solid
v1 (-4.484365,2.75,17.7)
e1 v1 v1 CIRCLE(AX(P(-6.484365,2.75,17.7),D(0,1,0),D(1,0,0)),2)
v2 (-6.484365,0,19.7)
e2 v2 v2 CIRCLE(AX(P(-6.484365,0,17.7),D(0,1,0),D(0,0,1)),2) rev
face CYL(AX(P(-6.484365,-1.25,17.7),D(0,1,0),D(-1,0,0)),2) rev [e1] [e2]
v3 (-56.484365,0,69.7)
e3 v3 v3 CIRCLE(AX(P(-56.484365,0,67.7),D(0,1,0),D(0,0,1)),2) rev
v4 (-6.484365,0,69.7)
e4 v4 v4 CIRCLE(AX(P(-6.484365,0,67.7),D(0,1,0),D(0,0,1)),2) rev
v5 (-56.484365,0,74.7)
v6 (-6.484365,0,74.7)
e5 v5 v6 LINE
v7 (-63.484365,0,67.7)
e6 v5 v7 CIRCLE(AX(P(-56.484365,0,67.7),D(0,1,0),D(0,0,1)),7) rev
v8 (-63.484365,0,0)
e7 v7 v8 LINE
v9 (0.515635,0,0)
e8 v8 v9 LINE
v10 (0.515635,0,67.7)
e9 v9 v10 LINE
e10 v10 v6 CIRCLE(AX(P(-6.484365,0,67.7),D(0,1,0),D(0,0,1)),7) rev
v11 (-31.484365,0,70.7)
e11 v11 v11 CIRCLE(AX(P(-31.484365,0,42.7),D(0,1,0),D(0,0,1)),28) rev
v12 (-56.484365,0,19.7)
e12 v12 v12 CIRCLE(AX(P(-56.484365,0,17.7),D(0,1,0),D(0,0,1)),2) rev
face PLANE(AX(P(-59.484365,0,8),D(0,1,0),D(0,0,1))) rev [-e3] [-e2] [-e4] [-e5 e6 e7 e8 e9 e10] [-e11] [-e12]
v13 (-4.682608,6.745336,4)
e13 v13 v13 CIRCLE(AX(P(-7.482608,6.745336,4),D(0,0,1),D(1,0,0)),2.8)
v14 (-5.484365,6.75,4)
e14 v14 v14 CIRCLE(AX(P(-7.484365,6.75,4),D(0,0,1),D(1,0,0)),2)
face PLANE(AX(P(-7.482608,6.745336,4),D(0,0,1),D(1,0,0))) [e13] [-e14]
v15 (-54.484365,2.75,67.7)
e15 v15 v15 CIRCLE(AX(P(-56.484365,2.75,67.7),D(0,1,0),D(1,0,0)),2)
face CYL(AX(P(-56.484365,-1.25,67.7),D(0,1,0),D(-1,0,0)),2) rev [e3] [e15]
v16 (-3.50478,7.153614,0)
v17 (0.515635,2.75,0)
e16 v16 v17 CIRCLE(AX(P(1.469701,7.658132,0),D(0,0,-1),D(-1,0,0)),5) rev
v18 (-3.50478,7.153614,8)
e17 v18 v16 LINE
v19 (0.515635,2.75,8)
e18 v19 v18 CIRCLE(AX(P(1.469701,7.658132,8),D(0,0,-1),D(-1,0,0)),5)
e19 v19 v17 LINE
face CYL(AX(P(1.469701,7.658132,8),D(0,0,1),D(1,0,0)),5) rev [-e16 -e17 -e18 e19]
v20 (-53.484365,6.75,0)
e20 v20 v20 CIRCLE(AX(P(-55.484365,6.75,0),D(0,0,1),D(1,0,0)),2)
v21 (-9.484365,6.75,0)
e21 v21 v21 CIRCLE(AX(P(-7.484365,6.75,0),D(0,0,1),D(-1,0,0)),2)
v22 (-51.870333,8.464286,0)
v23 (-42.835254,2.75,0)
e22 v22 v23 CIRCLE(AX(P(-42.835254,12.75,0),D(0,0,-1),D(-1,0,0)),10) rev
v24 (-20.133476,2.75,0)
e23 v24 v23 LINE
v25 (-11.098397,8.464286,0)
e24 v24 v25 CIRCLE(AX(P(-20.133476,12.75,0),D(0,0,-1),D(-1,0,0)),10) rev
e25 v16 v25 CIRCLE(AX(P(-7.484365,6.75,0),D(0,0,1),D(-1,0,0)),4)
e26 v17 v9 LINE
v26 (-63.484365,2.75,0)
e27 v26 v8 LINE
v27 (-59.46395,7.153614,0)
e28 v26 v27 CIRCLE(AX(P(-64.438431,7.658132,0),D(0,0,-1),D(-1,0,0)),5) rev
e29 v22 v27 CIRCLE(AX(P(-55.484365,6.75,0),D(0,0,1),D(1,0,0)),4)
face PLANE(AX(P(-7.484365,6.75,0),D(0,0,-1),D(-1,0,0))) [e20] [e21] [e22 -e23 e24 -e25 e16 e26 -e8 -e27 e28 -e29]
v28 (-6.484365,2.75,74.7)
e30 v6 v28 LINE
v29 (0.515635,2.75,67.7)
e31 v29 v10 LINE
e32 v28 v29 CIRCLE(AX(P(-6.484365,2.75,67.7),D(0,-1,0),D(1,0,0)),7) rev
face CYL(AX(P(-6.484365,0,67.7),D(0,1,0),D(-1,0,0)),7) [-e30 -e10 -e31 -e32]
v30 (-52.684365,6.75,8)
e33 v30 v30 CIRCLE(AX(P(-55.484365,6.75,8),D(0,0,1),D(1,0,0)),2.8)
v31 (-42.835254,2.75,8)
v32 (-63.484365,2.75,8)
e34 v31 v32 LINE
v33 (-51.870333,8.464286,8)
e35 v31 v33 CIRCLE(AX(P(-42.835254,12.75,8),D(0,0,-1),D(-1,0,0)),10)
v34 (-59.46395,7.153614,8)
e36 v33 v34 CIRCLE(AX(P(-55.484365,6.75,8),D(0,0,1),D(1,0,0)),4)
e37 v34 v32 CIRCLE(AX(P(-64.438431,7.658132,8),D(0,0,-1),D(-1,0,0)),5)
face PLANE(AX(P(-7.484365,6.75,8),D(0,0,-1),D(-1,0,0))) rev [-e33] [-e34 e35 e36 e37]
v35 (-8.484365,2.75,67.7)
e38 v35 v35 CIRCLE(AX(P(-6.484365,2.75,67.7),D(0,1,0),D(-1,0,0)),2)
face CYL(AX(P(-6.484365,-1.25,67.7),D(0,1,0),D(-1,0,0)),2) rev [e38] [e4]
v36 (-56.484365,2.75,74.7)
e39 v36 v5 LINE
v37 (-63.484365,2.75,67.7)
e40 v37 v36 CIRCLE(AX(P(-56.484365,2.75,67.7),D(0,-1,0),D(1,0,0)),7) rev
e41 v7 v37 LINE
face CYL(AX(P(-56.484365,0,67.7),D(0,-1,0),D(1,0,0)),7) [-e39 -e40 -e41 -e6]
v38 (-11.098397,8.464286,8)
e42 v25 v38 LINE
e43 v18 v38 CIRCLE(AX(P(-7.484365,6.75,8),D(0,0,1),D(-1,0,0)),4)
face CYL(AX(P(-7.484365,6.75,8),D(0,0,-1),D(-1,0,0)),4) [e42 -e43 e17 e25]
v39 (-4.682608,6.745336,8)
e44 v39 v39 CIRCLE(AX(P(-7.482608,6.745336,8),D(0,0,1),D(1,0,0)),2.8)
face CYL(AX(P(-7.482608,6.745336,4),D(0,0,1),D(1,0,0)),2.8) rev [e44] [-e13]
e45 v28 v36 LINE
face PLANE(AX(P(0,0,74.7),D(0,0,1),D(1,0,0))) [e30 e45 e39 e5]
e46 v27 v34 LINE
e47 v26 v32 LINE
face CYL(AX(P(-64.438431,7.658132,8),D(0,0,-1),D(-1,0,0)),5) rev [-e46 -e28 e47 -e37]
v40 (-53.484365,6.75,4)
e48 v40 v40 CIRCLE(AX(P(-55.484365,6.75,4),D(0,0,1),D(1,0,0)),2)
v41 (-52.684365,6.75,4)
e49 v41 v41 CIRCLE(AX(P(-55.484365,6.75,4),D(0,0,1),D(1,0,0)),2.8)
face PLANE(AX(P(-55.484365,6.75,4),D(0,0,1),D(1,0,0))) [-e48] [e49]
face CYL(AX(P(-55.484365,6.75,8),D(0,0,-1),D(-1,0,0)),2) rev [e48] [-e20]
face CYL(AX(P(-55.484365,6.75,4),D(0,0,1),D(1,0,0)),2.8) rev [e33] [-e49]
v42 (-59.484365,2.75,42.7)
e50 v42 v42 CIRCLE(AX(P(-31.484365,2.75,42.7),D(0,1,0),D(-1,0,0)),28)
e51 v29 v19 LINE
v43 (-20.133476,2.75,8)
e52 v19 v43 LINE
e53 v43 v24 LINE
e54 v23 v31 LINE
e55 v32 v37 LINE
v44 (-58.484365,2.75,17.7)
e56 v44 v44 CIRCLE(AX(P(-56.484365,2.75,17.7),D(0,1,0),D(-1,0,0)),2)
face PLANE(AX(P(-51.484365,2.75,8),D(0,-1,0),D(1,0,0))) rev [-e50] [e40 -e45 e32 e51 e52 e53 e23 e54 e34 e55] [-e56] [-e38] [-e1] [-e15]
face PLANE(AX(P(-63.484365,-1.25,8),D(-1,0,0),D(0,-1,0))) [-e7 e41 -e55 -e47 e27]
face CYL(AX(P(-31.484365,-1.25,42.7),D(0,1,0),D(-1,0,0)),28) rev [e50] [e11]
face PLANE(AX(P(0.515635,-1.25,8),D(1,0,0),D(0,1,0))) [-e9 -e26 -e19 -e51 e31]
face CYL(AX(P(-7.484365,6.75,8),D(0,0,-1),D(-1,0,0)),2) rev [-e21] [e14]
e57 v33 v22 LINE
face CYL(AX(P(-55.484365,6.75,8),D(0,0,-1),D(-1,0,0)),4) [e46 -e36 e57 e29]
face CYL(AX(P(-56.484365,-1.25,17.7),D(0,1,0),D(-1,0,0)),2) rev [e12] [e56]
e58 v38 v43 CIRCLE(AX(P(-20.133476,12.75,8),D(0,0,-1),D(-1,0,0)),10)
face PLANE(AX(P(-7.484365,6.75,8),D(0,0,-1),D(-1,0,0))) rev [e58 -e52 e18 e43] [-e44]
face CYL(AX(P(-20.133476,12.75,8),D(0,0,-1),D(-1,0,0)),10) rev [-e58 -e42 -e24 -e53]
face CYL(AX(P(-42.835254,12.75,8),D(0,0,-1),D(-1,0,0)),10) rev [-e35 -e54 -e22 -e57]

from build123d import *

# Parameters (mm, degrees)
SCHIZZO1_R                        = 2
ESTRUSIONE_ESTRUSIONE1_DEPTH      = 8
SCHIZZO3_W                        = 50
SCHIZZO3_H                        = 2.75
ESTRUSIONE_ESTRUSIONE3_DEPTH      = 55
RACCORDO1_R                       = 4
SCHIZZO4_R                        = 23
TAGLIO_ESTRUSIONE1_DEPTH          = 4
SCHIZZO5_R                        = 2
TAGLIO_ESTRUSIONE2_DEPTH          = 4
RACCORDO2_R                       = 124
SCHIZZO6_R                        = 2.8
TAGLIO_ESTRUSIONE3_DEPTH          = 4
SCHIZZO7_W                        = 64
SCHIZZO7_H                        = 66
SCHIZZO7_R                        = 28
ESTRUSIONE_ESTRUSIONE4_DEPTH      = 4
SCHIZZO8_R                        = 28
TAGLIO_ESTRUSIONE4_DEPTH          = 10
SCHIZZO9_R                        = 2
TAGLIO_ESTRUSIONE5_DEPTH          = 4
RACCORDO3_R                       = 3
RACCORDO4_R                       = 3
SCHIZZO10_W                       = 88.736042833
SCHIZZO10_H                       = 81.022332295
TAGLIO_ESTRUSIONE6_DEPTH          = 1.25
SCHIZZO11_W                       = 58
SCHIZZO11_H                       = 2.75
ESTRUSIONE_ESTRUSIONE5_DEPTH      = 0.7
RACCORDO6_START                   = -1
RACCORDO6_DEPTH                   = 5
RACCORDO8_START                   = -1
RACCORDO8_DEPTH                   = 5
ESTRUSIONE_ESTRUSIONE6_DEPTH      = 4
ESTRUSIONE_ESTRUSIONE6_DEPTH_BACK = 2.75
SCHIZZO12_W                       = 64
SCHIZZO12_H                       = 11.748328584
SCHIZZO14_W                       = 64
SCHIZZO14_H                       = 11.748328584
TAGLIO_ESTRUSIONE7_DEPTH          = 4
RACCORDO9_R                       = 10
RACCORDO10_R                      = 5


with BuildPart() as part:
    # Schizzo1 → Estrusione-Estrusione1 (new body)
    with BuildSketch(Plane.XY):
        with BuildLine():
            Line((-59.484364928, 0), (-3.484364928, 0))
            Line((-3.484364928, 0), (-3.484364928, 6.75))
            ThreePointArc((-3.484364928, 6.75), (-7.484364928, 10.75), (-11.484364928, 6.75))
            Line((-11.484364928, 6.75), (-11.484364928, 2.75))
            Line((-11.484364928, 2.75), (-23.484364928, 2.75))
            Line((-23.484364928, 2.75), (-39.484364928, 2.75))
            Line((-39.484364928, 2.75), (-51.484364928, 2.75))
            Line((-51.484364928, 2.75), (-51.484364928, 6.75))
            ThreePointArc((-51.484364928, 6.75), (-55.484364928, 10.75), (-59.484364928, 6.75))
            Line((-59.484364928, 6.75), (-59.484364928, 0))
        make_face()
        with Locations((-55.484364928, 6.75)):
            Circle(SCHIZZO1_R, mode=Mode.SUBTRACT)
        with Locations(Location((-7.484364928, 6.75, 0), (0, 0, 180))):
            Circle(SCHIZZO1_R, mode=Mode.SUBTRACT)
    extrude(amount=ESTRUSIONE_ESTRUSIONE1_DEPTH)

    # Schizzo3 → Estrusione-Estrusione3 (add)
    with BuildSketch(Plane.XY.offset(8)):
        with Locations((-31.482821648, 1.375)):
            Rectangle(SCHIZZO3_W, SCHIZZO3_H)
    extrude(amount=ESTRUSIONE_ESTRUSIONE3_DEPTH)

    # Raccordo1
    raccordo1_edges = [part.edges().sort_by_distance(p)[0] for p in [
        (-56.482821648, 1.375, 63),
        (-6.482821648, 1.375, 63),
    ]]
    fillet(raccordo1_edges, radius=RACCORDO1_R)

    # Schizzo4 → Taglio-Estrusione1 (cut)
    with BuildSketch(Plane(origin=(0, 2.75, 0), x_dir=(1, 0, 0), z_dir=(0, 1, 0))):
        with Locations(Location((-31.482821648, -35.97589666, 0), (0, 0, 180))):
            Circle(SCHIZZO4_R)
    extrude(amount=-TAGLIO_ESTRUSIONE1_DEPTH, mode=Mode.SUBTRACT)

    # Schizzo5 → Taglio-Estrusione2 (cut)
    with BuildSketch(Plane(origin=(0, 2.75, 0), x_dir=(1, 0, 0), z_dir=(0, 1, 0))):
        with Locations(Location((-51.482821648, -15.97589666, 0), (0, 0, 180))):
            Circle(SCHIZZO5_R)
        with Locations(Location((-51.482821648, -55.97589666, 0), (0, 0, 180))):
            Circle(SCHIZZO5_R)
        with Locations(Location((-11.482821648, -15.97589666, 0), (0, 0, 180))):
            Circle(SCHIZZO5_R)
        with Locations(Location((-11.482821648, -55.97589666, 0), (0, 0, 180))):
            Circle(SCHIZZO5_R)
    extrude(amount=-TAGLIO_ESTRUSIONE2_DEPTH, mode=Mode.SUBTRACT)

    # Raccordo2
    # the kernel refuses this fillet: 124 mm, written as the material it adds along each edge
    with BuildSketch(Plane(origin=(-56.482821648, 2.75, 8), x_dir=(0, 0, 1), z_dir=(0, -1, 0))) as raccordo2_piece_1:
        with BuildLine():
            CenterArc((27.117770399, 124), RACCORDO2_R, 257.367798326, 12.632201674)
            Line((0, 3.00154328), (0, 0))
            Line((0, 0), (27.117770399, 0))
        make_face()
    extrude(amount=2.75)
    with BuildSketch(Plane(origin=(-6.482821648, 0, 8), x_dir=(0, 0, 1), z_dir=(0, 1, 0))) as raccordo2_piece_2:
        with BuildLine():
            CenterArc((27.10399461, 124), RACCORDO2_R, 257.374321421, 12.625678579)
            Line((0, 2.99845672), (0, 0))
            Line((0, 0), (27.10399461, 0))
        make_face()
    extrude(amount=2.75)

    # Schizzo6 → Taglio-Estrusione3 (cut)
    with BuildSketch(Plane.XY.offset(8)):
        with Locations((-55.484364928, 6.75)):
            Circle(SCHIZZO6_R)
        with Locations((-7.48260826, 6.745335699)):
            Circle(SCHIZZO6_R)
    extrude(amount=-TAGLIO_ESTRUSIONE3_DEPTH, mode=Mode.SUBTRACT)

    # Schizzo7 → Estrusione-Estrusione4 (add)
    with BuildSketch(Plane(origin=(0, 2.75, 0), x_dir=(1, 0, 0), z_dir=(0, 1, 0))):
        with Locations((-31.484364928, -41)):
            Rectangle(SCHIZZO7_W, SCHIZZO7_H)
        with Locations(Location((-31.484364928, -42.7, 0), (0, 0, 180))):
            Circle(SCHIZZO7_R, mode=Mode.SUBTRACT)
    extrude(amount=-ESTRUSIONE_ESTRUSIONE4_DEPTH)

    # Schizzo8 → Taglio-Estrusione4 (cut)
    with BuildSketch(Plane(origin=(0, 2.75, 0), x_dir=(1, 0, 0), z_dir=(0, 1, 0))):
        with Locations(Location((-31.484364928, -42.7, 0), (0, 0, 180))):
            Circle(SCHIZZO8_R)
    extrude(amount=-TAGLIO_ESTRUSIONE4_DEPTH, mode=Mode.SUBTRACT)

    # Schizzo9 → Taglio-Estrusione5 (cut)
    with BuildSketch(Plane(origin=(0, 2.75, 0), x_dir=(1, 0, 0), z_dir=(0, 1, 0))):
        with Locations(Location((-6.484364928, -67.7, 0), (0, 0, 180))):
            Circle(SCHIZZO9_R)
        with Locations((-6.484364928, -17.7)):
            Circle(SCHIZZO9_R)
        with Locations((-56.484364928, -67.7)):
            Circle(SCHIZZO9_R)
        with Locations(Location((-56.484364928, -17.7, 0), (0, 0, 180))):
            Circle(SCHIZZO9_R)
    extrude(amount=-TAGLIO_ESTRUSIONE5_DEPTH, mode=Mode.SUBTRACT)

    # Raccordo3
    # the kernel refuses this fillet: 3 mm, written as the material it adds along each edge
    with BuildSketch(Plane(origin=(-59.484364928, 0, 8), x_dir=(0, -1, 0), z_dir=(1, 0, 0))) as raccordo3_piece_1:
        with BuildLine():
            CenterArc((3, 2.436698586), RACCORDO3_R, 180, 54.314665287)
            Line((0, 2.436698586), (0, 0))
            Line((0, 0), (1.25, 0))
        make_face()
    extrude(amount=56)
    with BuildSketch(Plane(origin=(-3.484364928, 0, 8), x_dir=(1, 0, 0), z_dir=(0, 1, 0)), Plane(origin=(-59.484364928, 2.75, 8), x_dir=(-1, 0, 0), z_dir=(0, -1, 0))) as raccordo3_piece_2:
        with BuildLine():
            CenterArc((RACCORDO3_R, RACCORDO3_R), RACCORDO3_R, 180, 90)
            Line((0, RACCORDO3_R), (0, 0))
            Line((0, 0), (RACCORDO3_R, 0))
        make_face()
    extrude(amount=2.75)
    with BuildSketch(Plane(origin=(-65.576111393, 0, 8), x_dir=(0, -1, 0), z_dir=(1, 0, 0))) as raccordo3_piece_3a_section:
        with BuildLine():
            CenterArc((3, 2.436698586), RACCORDO3_R, 180, 54.314665287)
            Line((0, 2.436698586), (0, 0))
            Line((0, 0), (1.25, 0))
        make_face()
    raccordo3_piece_3a = extrude(amount=62.091746466, mode=Mode.PRIVATE)
    raccordo3_piece_3a = split(raccordo3_piece_3a, bisect_by=Plane(origin=(-63.484364928, 0, 8), z_dir=(1, 0, 0)), keep=Keep.TOP, mode=Mode.PRIVATE)
    raccordo3_piece_3a = split(raccordo3_piece_3a, bisect_by=Plane(origin=(-59.484364928, 0, 8), z_dir=(-1, 0, 0)), keep=Keep.TOP, mode=Mode.PRIVATE)
    with BuildSketch(Plane(origin=(-59.484364928, 2.75, 8), x_dir=(-1, 0, 0), z_dir=(0, -1, 0))) as raccordo3_piece_3b_section:
        with BuildLine():
            CenterArc((RACCORDO3_R, RACCORDO3_R), RACCORDO3_R, 180, 90)
            Line((0, RACCORDO3_R), (0, 0))
            Line((0, 0), (RACCORDO3_R, 0))
        make_face()
    raccordo3_piece_3b = extrude(amount=10.25, mode=Mode.PRIVATE)
    raccordo3_piece_3b = split(raccordo3_piece_3b, bisect_by=Plane(origin=(-59.484364928, 0, 8), z_dir=(0, -1, 0)), keep=Keep.TOP, mode=Mode.PRIVATE)
    raccordo3_piece_3b = split(raccordo3_piece_3b, bisect_by=Plane(origin=(-59.484364928, -1.25, 8), z_dir=(0, 1, 0)), keep=Keep.TOP, mode=Mode.PRIVATE)
    raccordo3_piece_3 = raccordo3_piece_3a & raccordo3_piece_3b
    add(raccordo3_piece_3)
    with BuildSketch(Plane(origin=(-3.484364928, -7.5, 8), x_dir=(1, 0, 0), z_dir=(0, 1, 0))) as raccordo3_piece_4a_section:
        with BuildLine():
            CenterArc((RACCORDO3_R, RACCORDO3_R), RACCORDO3_R, 180, 90)
            Line((0, RACCORDO3_R), (0, 0))
            Line((0, 0), (RACCORDO3_R, 0))
        make_face()
    raccordo3_piece_4a = extrude(amount=10.25, mode=Mode.PRIVATE)
    raccordo3_piece_4a = split(raccordo3_piece_4a, bisect_by=Plane(origin=(-3.484364928, 0, 8), z_dir=(0, -1, 0)), keep=Keep.TOP, mode=Mode.PRIVATE)
    raccordo3_piece_4a = split(raccordo3_piece_4a, bisect_by=Plane(origin=(-3.484364928, -1.25, 8), z_dir=(0, 1, 0)), keep=Keep.TOP, mode=Mode.PRIVATE)
    with BuildSketch(Plane(origin=(-59.484364928, 0, 8), x_dir=(0, -1, 0), z_dir=(1, 0, 0))) as raccordo3_piece_4b_section:
        with BuildLine():
            CenterArc((3, 2.436698586), RACCORDO3_R, 180, 54.314665287)
            Line((0, 2.436698586), (0, 0))
            Line((0, 0), (1.25, 0))
        make_face()
    raccordo3_piece_4b = extrude(amount=62.091746466, mode=Mode.PRIVATE)
    raccordo3_piece_4b = split(raccordo3_piece_4b, bisect_by=Plane(origin=(0.515635072, 0, 8), z_dir=(-1, 0, 0)), keep=Keep.TOP, mode=Mode.PRIVATE)
    raccordo3_piece_4b = split(raccordo3_piece_4b, bisect_by=Plane(origin=(-3.484364928, 0, 8), z_dir=(1, 0, 0)), keep=Keep.TOP, mode=Mode.PRIVATE)
    raccordo3_piece_4 = raccordo3_piece_4a & raccordo3_piece_4b
    add(raccordo3_piece_4)
    # the kernel refuses this fillet: 3 mm, written as the material it takes off along each edge
    with BuildSketch(Plane(origin=(0.515635072, 10.25, 74), x_dir=(-1, 0, 0), z_dir=(0, -1, 0)), Plane(origin=(-63.484364928, 10.25, 74), x_dir=(0, 0, -1), z_dir=(0, -1, 0))) as raccordo3_2_piece_1:
        with BuildLine():
            CenterArc((RACCORDO3_R, RACCORDO3_R), RACCORDO3_R, 180, 90)
            Line((0, RACCORDO3_R), (0, 0))
            Line((0, 0), (RACCORDO3_R, 0))
        make_face()
    extrude(amount=19, mode=Mode.SUBTRACT)

    # Raccordo4
    # the kernel refuses this fillet: 3 mm, written as the material it takes off along each edge
    with BuildSketch(Plane(origin=(-63.484364928, 9.392135624, 8), x_dir=(0.9963405296085128, 0, -0.08547250469845889), z_dir=(0, -1, 0))) as raccordo4_piece_1:
        with BuildLine():
            CenterArc((2.761933602, 2.903549084), RACCORDO4_R, 184.903196278, 70.528779366)
            Line((-0.227087987, 2.64713157), (-0.525990146, 2.621489819))
            Line((-0.525990146, 2.621489819), (-0.298902159, -0.025641751))
            Line((-0.298902159, -0.025641751), (0.025641751, -0.298902159))
            ThreePointArc((0.025641751, -0.298902159), (1.021982281, -0.213429654), (1.931887045, -0.290354908))
            Line((1.931887045, -0.290354908), (2.007345823, 0))
        make_face()
    extrude(amount=17.284271247, mode=Mode.SUBTRACT)
    with BuildSketch(Plane(origin=(0.515635072, 9.392135624, 8), x_dir=(-0.9963405296085196, 0, -0.08547250469837912), z_dir=(0, -1, 0))) as raccordo4_piece_2:
        with BuildLine():
            CenterArc((2.761933602, -2.903549084), RACCORDO4_R, 104.568024357, 70.528779366)
            Line((-0.227087987, -2.64713157), (-0.525990146, -2.621489819))
            Line((-0.525990146, -2.621489819), (-0.298902159, 0.025641751))
            Line((-0.298902159, 0.025641751), (0.025641751, 0.298902159))
            ThreePointArc((0.025641751, 0.298902159), (1.021982281, 0.213429654), (1.931887045, 0.290354908))
            Line((1.931887045, 0.290354908), (2.007345823, 0))
        make_face()
    extrude(amount=17.284271247, mode=Mode.SUBTRACT)

    # Schizzo10 → Taglio-Estrusione6 (cut)
    with BuildSketch(Plane.XZ.offset(1.25)):
        with Locations((-36.992061707, 40.511166147)):
            Rectangle(SCHIZZO10_W, SCHIZZO10_H)
    extrude(amount=-TAGLIO_ESTRUSIONE6_DEPTH, mode=Mode.SUBTRACT)

    # Schizzo11 → Estrusione-Estrusione5 (add)
    with BuildSketch(Plane.XY.offset(74)):
        with Locations((-31.484364928, 1.375)):
            Rectangle(SCHIZZO11_W, SCHIZZO11_H)
    extrude(amount=ESTRUSIONE_ESTRUSIONE5_DEPTH)

    # Raccordo6: read off the stored shape, not the designer's step
    # Raccordo6 outline → Raccordo6 (cut)
    with BuildSketch(Plane(origin=(0, 0, 0), x_dir=(1, 0, 0), z_dir=(0, 1, 0)).offset(RACCORDO6_START)):
        with BuildLine():
            Line((-60.484364928, -74.7), (-56.484364928, -74.7))
            ThreePointArc((-56.484364928, -74.7), (-61.434112396, -72.649747468), (-63.484364928, -67.7))
            Line((-63.484364928, -67.7), (-63.484364928, -71))
            ThreePointArc((-63.484364928, -71), (-62.605685271, -73.121320344), (-60.484364928, -74))
            Line((-60.484364928, -74), (-60.484364928, -74.7))
        make_face()
    extrude(amount=RACCORDO6_DEPTH, mode=Mode.SUBTRACT)

    # Raccordo8: read off the stored shape, not the designer's step
    # Raccordo8 outline → Raccordo8 (cut)
    with BuildSketch(Plane(origin=(0, 0, 0), x_dir=(1, 0, 0), z_dir=(0, 1, 0)).offset(RACCORDO8_START)):
        with BuildLine():
            ThreePointArc((0.515635072, -67.7), (-1.53461746, -72.649747468), (-6.484364928, -74.7))
            Line((-6.484364928, -74.7), (-2.484364928, -74.7))
            Line((-2.484364928, -74.7), (-2.484364928, -74))
            ThreePointArc((-2.484364928, -74), (-0.363044584, -73.121320344), (0.515635072, -71))
            Line((0.515635072, -71), (0.515635072, -67.7))
        make_face()
    extrude(amount=RACCORDO8_DEPTH, mode=Mode.SUBTRACT)

    # Schizzo12 → Estrusione-Estrusione6 (add, two sides: drawn at the far end of the back side and taken through both)
    with BuildSketch(Plane.XZ.offset(-ESTRUSIONE_ESTRUSIONE6_DEPTH_BACK)):
        with Locations((-31.484364928, 5.874164292)):
            Rectangle(SCHIZZO12_W, SCHIZZO12_H)
    extrude(amount=ESTRUSIONE_ESTRUSIONE6_DEPTH + ESTRUSIONE_ESTRUSIONE6_DEPTH_BACK)

    # Schizzo14 → Taglio-Estrusione7 (cut)
    with BuildSketch(Plane.XZ.offset(4)):
        with Locations((-31.484364928, 5.874164292)):
            Rectangle(SCHIZZO14_W, SCHIZZO14_H)
    extrude(amount=-TAGLIO_ESTRUSIONE7_DEPTH, mode=Mode.SUBTRACT)

    # Raccordo9
    # the kernel refuses this fillet: 10 mm, written as the material it adds along each edge
    with BuildSketch(Plane(origin=(-11.484364928, 2.75, 0), x_dir=(-1, 0, 0), z_dir=(0, 0, 1))) as raccordo9_piece_1:
        with BuildLine():
            CenterArc((8.649110641, -10), RACCORDO9_R, 90, 64.623066475)
            Line((-0.385968388, -5.714285714), (-1.289476291, -5.285714286))
            ThreePointArc((-1.289476291, -5.285714286), (-1, -4), (-1, 0))
            Line((-1, 0), (0, 1))
            Line((0, 1), (8.649110641, 1))
            Line((8.649110641, 1), (8.649110641, 0))
        make_face()
    extrude(amount=8)
    with BuildSketch(Plane(origin=(-51.484364928, 2.75, 0), x_dir=(1, 0, 0), z_dir=(0, 0, 1))) as raccordo9_piece_2:
        with BuildLine():
            CenterArc((8.649110641, 10), RACCORDO9_R, 205.376933525, 64.623066475)
            Line((-0.385968388, 5.714285714), (-1.289476291, 5.285714286))
            ThreePointArc((-1.289476291, 5.285714286), (-1, 4), (-1, 0))
            Line((-1, 0), (0, -1))
            Line((0, -1), (8.649110641, -1))
            Line((8.649110641, -1), (8.649110641, 0))
        make_face()
    extrude(amount=8)

    # Raccordo10
    # the kernel refuses this fillet: 5 mm, written as the material it adds along each edge
    with BuildSketch(Plane(origin=(-3.484364928, 2.75, 0), x_dir=(-0.00463594795173994, 0.9999892539355554, 0), z_dir=(0, 0, 1)), Plane(origin=(-59.484364928, 2.75, 8), x_dir=(0.0046359479517115295, 0.9999892539355555, 0), z_dir=(0, 0, -1))) as raccordo10_piece_1:
        with BuildLine():
            CenterArc((4.885112311, -4.97676653), RACCORDO10_R, 95.525581396, 73.208552885)
            Line((-0.018543792, -3.999957016), (-0.508909402, -3.902276064))
            ThreePointArc((-0.508909402, -3.902276064), (-0.509266523, -1.997660534), (-0.499994627, 0.002317974))
            Line((-0.499994627, 0.002317974), (0.002317974, 0.499994627))
            ThreePointArc((0.002317974, 0.499994627), (4.00227499, 0.481450835), (4.355516392, 0.497676653))
            Line((4.355516392, 0.497676653), (4.403661476, 0))
        make_face()
    extrude(amount=8)


solid = part.part
